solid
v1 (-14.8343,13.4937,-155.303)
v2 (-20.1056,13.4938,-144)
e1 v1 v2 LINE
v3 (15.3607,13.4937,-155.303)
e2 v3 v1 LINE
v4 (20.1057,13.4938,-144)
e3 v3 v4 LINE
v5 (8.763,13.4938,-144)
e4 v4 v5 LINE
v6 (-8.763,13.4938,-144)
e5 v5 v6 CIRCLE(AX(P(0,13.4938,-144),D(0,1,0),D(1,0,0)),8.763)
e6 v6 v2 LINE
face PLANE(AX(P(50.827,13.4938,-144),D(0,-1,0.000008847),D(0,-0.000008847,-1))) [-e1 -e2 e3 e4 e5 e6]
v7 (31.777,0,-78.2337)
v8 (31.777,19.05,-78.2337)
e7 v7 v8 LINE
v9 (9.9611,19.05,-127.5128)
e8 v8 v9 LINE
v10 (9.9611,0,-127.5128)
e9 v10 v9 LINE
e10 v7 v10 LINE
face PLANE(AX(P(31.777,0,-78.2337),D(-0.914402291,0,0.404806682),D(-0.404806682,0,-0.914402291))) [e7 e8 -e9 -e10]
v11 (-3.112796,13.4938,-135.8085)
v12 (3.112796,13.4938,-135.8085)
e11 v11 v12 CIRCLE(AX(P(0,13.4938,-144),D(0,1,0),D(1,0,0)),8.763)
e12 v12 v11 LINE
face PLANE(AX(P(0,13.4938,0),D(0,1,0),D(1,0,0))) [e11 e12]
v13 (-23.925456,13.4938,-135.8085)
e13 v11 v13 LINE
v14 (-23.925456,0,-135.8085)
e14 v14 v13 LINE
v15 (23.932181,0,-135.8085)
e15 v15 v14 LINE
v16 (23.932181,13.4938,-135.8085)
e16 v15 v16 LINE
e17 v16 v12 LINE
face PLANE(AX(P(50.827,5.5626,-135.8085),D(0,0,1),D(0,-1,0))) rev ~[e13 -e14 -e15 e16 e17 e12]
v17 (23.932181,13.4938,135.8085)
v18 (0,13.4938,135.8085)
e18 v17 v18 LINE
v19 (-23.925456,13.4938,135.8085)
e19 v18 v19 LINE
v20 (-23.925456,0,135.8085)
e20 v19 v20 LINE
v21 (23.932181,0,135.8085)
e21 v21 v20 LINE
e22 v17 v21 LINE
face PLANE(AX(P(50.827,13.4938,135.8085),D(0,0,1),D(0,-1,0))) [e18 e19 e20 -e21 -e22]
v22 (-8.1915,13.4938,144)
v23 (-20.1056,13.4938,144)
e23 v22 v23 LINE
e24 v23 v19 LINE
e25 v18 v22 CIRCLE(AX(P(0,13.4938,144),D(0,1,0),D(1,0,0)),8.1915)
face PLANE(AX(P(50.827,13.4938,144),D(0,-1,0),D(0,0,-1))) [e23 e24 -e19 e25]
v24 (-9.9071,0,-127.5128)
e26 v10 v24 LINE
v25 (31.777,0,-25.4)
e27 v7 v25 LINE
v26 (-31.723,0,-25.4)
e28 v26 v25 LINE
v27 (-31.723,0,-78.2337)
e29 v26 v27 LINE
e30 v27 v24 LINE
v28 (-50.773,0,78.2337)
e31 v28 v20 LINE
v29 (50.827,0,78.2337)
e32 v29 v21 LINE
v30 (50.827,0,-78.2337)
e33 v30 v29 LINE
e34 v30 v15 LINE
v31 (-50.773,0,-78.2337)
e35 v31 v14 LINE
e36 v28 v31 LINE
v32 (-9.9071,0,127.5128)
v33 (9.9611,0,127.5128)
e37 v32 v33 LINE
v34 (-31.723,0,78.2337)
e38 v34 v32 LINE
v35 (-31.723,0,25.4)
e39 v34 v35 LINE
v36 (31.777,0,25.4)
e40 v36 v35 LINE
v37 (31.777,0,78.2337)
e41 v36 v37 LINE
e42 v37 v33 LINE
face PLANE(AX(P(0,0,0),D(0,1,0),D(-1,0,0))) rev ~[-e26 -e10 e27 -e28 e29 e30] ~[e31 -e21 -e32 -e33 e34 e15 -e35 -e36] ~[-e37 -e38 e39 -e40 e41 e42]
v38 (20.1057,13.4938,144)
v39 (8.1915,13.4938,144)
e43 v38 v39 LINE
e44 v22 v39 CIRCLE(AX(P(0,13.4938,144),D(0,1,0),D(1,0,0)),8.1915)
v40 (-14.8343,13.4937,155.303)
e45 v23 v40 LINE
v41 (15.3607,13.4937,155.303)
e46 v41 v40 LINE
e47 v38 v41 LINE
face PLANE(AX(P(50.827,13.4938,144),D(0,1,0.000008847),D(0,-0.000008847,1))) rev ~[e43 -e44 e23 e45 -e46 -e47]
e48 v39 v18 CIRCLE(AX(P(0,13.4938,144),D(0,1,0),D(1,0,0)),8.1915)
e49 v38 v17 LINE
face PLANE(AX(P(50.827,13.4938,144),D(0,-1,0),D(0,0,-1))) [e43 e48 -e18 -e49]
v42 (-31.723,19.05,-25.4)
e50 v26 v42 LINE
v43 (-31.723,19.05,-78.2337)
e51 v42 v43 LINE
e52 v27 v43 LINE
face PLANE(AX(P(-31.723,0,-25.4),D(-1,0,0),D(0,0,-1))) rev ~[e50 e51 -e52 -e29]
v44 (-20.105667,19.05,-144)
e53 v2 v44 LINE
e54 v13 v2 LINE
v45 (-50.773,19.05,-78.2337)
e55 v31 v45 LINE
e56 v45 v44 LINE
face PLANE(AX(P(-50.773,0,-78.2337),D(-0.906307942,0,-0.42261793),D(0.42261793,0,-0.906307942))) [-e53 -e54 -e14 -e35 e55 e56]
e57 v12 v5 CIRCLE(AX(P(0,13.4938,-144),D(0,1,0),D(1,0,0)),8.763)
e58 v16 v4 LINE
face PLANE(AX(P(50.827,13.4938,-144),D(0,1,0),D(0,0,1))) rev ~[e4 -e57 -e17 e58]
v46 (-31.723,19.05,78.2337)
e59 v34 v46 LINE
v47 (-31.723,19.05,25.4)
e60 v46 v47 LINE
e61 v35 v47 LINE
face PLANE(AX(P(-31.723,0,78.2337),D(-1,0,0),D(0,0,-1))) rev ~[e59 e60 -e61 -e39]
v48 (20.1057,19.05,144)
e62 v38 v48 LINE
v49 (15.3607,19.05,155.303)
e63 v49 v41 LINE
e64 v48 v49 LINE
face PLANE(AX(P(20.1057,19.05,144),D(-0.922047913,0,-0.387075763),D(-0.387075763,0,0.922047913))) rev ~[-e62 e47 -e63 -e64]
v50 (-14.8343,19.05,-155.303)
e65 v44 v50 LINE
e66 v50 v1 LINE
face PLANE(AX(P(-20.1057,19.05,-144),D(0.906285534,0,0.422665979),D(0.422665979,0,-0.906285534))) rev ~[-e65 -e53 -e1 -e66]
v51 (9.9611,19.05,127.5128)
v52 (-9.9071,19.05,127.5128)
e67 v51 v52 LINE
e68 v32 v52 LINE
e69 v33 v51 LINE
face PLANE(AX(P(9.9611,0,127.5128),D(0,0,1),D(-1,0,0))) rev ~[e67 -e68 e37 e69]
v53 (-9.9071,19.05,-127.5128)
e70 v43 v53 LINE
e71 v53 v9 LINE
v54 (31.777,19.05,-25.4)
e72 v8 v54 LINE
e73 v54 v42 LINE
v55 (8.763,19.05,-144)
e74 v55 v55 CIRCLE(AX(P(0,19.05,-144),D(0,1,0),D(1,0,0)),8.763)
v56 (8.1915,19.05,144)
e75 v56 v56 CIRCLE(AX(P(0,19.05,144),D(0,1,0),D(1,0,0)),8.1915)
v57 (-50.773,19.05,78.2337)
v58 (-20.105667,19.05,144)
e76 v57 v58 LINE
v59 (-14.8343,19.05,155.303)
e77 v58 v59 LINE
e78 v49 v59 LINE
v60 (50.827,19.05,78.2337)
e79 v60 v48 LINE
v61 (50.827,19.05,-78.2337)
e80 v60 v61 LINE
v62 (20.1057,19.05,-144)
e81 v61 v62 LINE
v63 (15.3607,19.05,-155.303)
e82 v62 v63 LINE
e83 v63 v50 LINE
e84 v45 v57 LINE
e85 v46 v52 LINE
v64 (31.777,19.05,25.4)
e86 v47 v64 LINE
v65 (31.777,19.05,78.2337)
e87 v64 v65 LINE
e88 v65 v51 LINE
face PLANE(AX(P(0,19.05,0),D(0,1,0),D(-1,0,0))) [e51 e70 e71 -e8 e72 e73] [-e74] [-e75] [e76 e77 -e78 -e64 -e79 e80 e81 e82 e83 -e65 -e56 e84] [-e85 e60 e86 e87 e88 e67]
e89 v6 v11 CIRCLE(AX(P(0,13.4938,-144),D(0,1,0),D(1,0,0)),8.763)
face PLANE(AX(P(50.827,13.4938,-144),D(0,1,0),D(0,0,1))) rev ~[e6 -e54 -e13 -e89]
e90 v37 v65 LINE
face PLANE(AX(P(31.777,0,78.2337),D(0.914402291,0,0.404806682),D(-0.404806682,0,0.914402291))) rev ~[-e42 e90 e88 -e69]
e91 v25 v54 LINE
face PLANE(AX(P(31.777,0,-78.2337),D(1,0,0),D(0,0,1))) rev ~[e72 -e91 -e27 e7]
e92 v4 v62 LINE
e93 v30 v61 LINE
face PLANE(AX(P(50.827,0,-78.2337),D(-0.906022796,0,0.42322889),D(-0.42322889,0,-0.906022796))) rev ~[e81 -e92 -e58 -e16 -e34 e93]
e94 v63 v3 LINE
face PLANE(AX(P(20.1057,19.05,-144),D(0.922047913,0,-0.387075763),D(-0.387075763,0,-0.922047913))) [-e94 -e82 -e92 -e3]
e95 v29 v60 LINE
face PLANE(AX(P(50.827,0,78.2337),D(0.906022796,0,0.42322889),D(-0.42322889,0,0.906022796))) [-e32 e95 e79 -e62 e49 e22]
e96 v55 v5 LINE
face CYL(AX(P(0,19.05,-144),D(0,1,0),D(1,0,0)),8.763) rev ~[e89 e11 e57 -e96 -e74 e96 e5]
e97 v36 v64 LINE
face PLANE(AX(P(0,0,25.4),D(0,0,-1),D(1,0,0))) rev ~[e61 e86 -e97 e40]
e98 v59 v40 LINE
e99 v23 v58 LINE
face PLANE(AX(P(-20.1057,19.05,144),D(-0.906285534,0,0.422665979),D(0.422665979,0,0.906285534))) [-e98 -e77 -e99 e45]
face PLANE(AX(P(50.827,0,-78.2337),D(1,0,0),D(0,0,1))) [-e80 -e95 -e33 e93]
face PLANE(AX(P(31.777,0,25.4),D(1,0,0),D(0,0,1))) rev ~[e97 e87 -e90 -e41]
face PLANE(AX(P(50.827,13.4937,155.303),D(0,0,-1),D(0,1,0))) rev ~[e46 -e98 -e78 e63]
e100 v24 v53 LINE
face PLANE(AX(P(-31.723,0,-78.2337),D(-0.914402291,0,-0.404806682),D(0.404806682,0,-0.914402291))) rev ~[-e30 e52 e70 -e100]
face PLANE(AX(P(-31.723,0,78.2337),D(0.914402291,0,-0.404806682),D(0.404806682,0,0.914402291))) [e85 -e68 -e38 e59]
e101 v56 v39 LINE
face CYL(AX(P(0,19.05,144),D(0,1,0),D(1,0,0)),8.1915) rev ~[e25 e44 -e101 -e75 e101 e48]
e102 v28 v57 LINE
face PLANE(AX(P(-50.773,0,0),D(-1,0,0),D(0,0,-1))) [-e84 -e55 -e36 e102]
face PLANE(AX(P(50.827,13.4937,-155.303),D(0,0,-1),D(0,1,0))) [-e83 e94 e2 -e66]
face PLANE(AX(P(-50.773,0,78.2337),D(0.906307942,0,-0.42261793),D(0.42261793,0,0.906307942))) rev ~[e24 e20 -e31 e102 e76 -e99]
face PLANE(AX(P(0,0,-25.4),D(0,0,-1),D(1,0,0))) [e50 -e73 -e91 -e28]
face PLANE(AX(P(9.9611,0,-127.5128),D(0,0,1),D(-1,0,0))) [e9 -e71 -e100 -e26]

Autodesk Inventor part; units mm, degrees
ref_plane "YZ Plane" through (0, 0, 0) normal (1, 0, 0) x (0, 1, 0)
ref_plane "XZ Plane" through (0, 0, 0) normal (0, 1, 0) x (-1, 0, 0)
ref_plane "XY Plane" through (0, 0, 0) normal (0, 0, 1) x (1, 0, 0)
sketch "Sketch1" plane through (0, 0, 0) normal (0, 1, 0) x (-1, 0, 0)
  line L0 (0, -213.8682) -> (0, 213.8682) projected
  line L1 (20.1057, -144) -> (-20.1057, -144)
  line L2 (-50.827, -78.2337) -> (-50.827, 78.2337)
  line L3 (-20.1057, 144) -> (20.1057, 144)
  line L4 (50.773, 78.2337) -> (50.773, -78.2337)
  line L5 (158.1712, 0) -> (-85.66, 0) projected
  line L6 (50.773, 78.2337) -> (20.1057, 144)
  line L7 (50.773, 78.2337) -> (123.3381, 78.2337) construction
  line L8 (-50.827, 78.2337) -> (-20.1057, 144)
  line L9 (-20.1057, 144) -> (20.1057, 144)
  line L10 (31.723, 78.2337) -> (31.723, -78.2337)
  line L11 (-31.777, -78.2337) -> (-31.777, 78.2337)
  line L12 (-20.1057, -144) -> (20.1057, -144)
  line L13 (50.773, -78.2337) -> (20.1057, -144)
  line L14 (-50.827, -78.2337) -> (-20.1057, -144)
  line L15 (31.723, -25.4) -> (31.723, 25.4)
  line L16 (31.723, -25.4) -> (-31.777, -25.4)
  line L17 (31.723, 25.4) -> (-31.777, 25.4)
  line L18 (31.723, 78.2337) -> (9.9071, 127.5128)
  line L19 (-31.777, 78.2337) -> (-9.9611, 127.5128)
  line L20 (-9.9611, 127.5128) -> (9.9071, 127.5128)
  line L21 (50.773, 78.2337) -> (31.723, 78.2337)
  line L22 (-31.777, 78.2337) -> (-50.827, 78.2337)
  line L23 (31.723, -78.2337) -> (9.9071, -127.5128)
  line L24 (-31.777, -78.2337) -> (-9.9611, -127.5128)
  line L25 (-9.9611, -127.5128) -> (9.9071, -127.5128)
  line L26 (50.773, -78.2337) -> (31.723, -78.2337)
  line L27 (-31.777, -78.2337) -> (-50.827, -78.2337)
  point P0 (50.8, -140)
  point P1 (-50.8, 140)
  point P2 (-50.8, -140)
  dimension "d49" = 280
  dimension "d51" = 115
  dimension "d52" = 101.6
  dimension "d53" = 50.8
  dimension "d71" = 288
extrude "Extrusion1" add sketch "Sketch1" along normal blind 19.05 contours L1 L14 L27 L24 L25 L0 | L0 L25 L23 L26 L13 L1 | L16 L11 L5 L0 | L0 L5 L10 L16 | L26 L10 L5 L4 | L2 L5 L11 L27 | L5 L11 L17 L0 | L0 L17 L10 L5 | L5 L10 L21 L4 | L2 L22 L11 L5 | L21 L18 L20 L0 L3 L6 | L8 L3 L0 L20 L19 L22
sketch "Sketch9" plane through (50.827, 0, 78.2337) normal (1, 0, 0) x (0, 0, -1)
  line L0 (-65.7663, 19.05) -> (0, 19.05) projected
  line L1 (-65.7663, 19.05) -> (-65.7663, 0)
  line L2 (-65.7663, 0) -> (-65.7663, 19.05) projected
  line L3 (-65.7663, 9.525) -> (-52.4585, 9.525)
  line L4 (-65.7663, 13.4938) -> (-65.7663, 5.5563)
  line L5 (-65.7663, 19.05) -> (-77.0693, 19.05)
  line L6 (-65.7663, 19.05) -> (-54.4633, 19.05) construction
  line L7 (-65.7663, 13.4938) -> (-77.0693, 13.4937)
  line L8 (-77.0693, 13.4937) -> (-77.0693, 19.05)
  line L9 (-65.7663, 19.05) -> (-65.7663, 13.4938)
  line L10 (78.2337, -3.81) -> (78.2337, 22.86) projected
  line L11 (222.2337, 19.05) -> (233.5367, 19.05)
  line L12 (222.2337, 13.4938) -> (233.5367, 13.4937)
  line L13 (233.5367, 13.4937) -> (233.5367, 19.05)
  line L14 (222.2337, 19.05) -> (222.2337, 13.4938)
  point P0 (78.2337, 0)
  dimension "d55" = 7.9375
  dimension "d56" = 11.303
  dimension "d57" = 180
extrude "Extrusion9" add sketch "Sketch9" against normal up to surface (70.9326 mm away)
sketch "Sketch10" plane through (0, 19.05, 0) normal (0, 1, 0) x (1, 0, 0)
  line L0 (20.1057, -144) -> (50.827, -78.2337) projected
  line L1 (20.1057, -144) -> (15.3607, -155.303)
  line L2 (50.827, -155.303) -> (-20.1057, -155.303) projected
  line L3 (15.3607, -155.303) -> (50.53, -155.303)
  line L4 (50.827, -144) -> (20.1057, -144) projected
  line L5 (20.1057, -144) -> (50.827, -144)
  line L6 (50.827, -144) -> (50.827, -155.303) projected
  line L7 (50.827, -144) -> (50.827, -155.303)
  line L8 (50.827, -155.303) -> (50.827, -144)
  line L9 (50.827, -155.303) -> (15.3607, -155.303)
  line L10 (-71.093, 0) -> (71.147, 0) projected
  line L11 (20.1057, 144) -> (15.3607, 155.303)
  line L12 (15.3607, 155.303) -> (50.53, 155.303)
  line L13 (50.827, 144) -> (20.1057, 144)
  line L14 (20.1057, 144) -> (50.827, 144)
  line L15 (50.827, 144) -> (50.827, 155.303)
  line L16 (50.827, 144) -> (50.827, 155.303)
  line L17 (50.827, 155.303) -> (50.827, 144)
  line L18 (50.827, 155.303) -> (15.3607, 155.303)
  line L19 (-20.1057, -144) -> (-14.8343, -155.303)
  line L20 (-20.1057, -155.303) -> (-14.8343, -155.303)
  line L21 (-50.773, -78.2337) -> (-20.1057, -144) projected
  line L22 (-20.1057, -155.303) -> (-20.1057, -144)
  line L23 (-20.1057, 144) -> (-14.8343, 155.303)
  line L24 (-20.1057, 155.303) -> (-14.8343, 155.303)
  line L25 (-20.1057, 155.303) -> (-20.1057, 144)
  point P0 (0, 0)
extrude "Extrusion10" cut sketch "Sketch10" against normal up to surface (19.05 mm away)
ref_plane "Work Plane1" through (50.827, 5.5626, -144) normal (0, 1, 0) x (1, 0, 0)
sketch "Sketch13" plane through (0, 19.05, 0) normal (0, 1, 0) x (1, 0, 0)
  circle A0 centre (0, -144) radius 8.1915
  circle A1 centre (0, 144) radius 8.763
  line L0 (-71.093, 0) -> (71.147, 0) projected
  point P0 (0, 0)
  dimension "d68" = 16.383
  dimension "d69" = 17.526
  dimension "d70" = 288
extrude "Extrusion13" cut sketch "Sketch13" against normal up to surface (5.5562 mm away)
sketch "Sketch14" plane through (50.827, 0, 78.2337) normal (1, 0, 0) x (0, 0, -1)
  line L0 (-57.5748, 19.05) -> (-57.5748, 5.5626) projected
  line L1 (-57.5748, 19.05) -> (-57.5748, 5.5626) projected
  line L2 (-57.5748, 19.05) -> (-57.5748, 5.5626) projected
  line L3 (-65.7663, 13.4938) -> (-57.5748, 13.4938)
  line L4 (-57.5748, 5.5626) -> (-57.5748, 13.4938)
  line L5 (-65.7663, 0) -> (-65.7663, 13.4938) projected
  line L6 (78.2337, -3.81) -> (78.2337, 22.86) projected
  line L7 (222.2337, 13.4938) -> (214.0422, 13.4938)
  line L8 (214.0422, 5.5626) -> (214.0422, 13.4938)
  line L9 (222.2337, 5.5626) -> (222.2337, 13.4938)
  line L10 (-57.5748, 5.5626) -> (-57.5748, 0)
  line L11 (-65.7663, 0) -> (0, 0) projected
  line L12 (-57.5748, 0) -> (-65.7663, 0)
  line L13 (-65.7663, 0) -> (-65.7663, 13.4938) projected
  line L14 (-65.7663, 0) -> (-65.7663, 13.4938)
  line L15 (222.2337, 0) -> (222.2337, 13.4938) projected
  line L16 (222.2337, 5.5626) -> (222.2337, 0)
  line L17 (222.2337, 0) -> (213.1622, 0)
  line L18 (156.4673, 0) -> (222.2337, 0) projected
  line L19 (214.0422, 5.5626) -> (214.0422, 0)
  point P0 (78.2337, 0)
  point P1 (-65.7663, 5.5626)
extrude "Extrusion14" cut sketch "Sketch14" against normal through all
properties part number "Diff_BarV2"
